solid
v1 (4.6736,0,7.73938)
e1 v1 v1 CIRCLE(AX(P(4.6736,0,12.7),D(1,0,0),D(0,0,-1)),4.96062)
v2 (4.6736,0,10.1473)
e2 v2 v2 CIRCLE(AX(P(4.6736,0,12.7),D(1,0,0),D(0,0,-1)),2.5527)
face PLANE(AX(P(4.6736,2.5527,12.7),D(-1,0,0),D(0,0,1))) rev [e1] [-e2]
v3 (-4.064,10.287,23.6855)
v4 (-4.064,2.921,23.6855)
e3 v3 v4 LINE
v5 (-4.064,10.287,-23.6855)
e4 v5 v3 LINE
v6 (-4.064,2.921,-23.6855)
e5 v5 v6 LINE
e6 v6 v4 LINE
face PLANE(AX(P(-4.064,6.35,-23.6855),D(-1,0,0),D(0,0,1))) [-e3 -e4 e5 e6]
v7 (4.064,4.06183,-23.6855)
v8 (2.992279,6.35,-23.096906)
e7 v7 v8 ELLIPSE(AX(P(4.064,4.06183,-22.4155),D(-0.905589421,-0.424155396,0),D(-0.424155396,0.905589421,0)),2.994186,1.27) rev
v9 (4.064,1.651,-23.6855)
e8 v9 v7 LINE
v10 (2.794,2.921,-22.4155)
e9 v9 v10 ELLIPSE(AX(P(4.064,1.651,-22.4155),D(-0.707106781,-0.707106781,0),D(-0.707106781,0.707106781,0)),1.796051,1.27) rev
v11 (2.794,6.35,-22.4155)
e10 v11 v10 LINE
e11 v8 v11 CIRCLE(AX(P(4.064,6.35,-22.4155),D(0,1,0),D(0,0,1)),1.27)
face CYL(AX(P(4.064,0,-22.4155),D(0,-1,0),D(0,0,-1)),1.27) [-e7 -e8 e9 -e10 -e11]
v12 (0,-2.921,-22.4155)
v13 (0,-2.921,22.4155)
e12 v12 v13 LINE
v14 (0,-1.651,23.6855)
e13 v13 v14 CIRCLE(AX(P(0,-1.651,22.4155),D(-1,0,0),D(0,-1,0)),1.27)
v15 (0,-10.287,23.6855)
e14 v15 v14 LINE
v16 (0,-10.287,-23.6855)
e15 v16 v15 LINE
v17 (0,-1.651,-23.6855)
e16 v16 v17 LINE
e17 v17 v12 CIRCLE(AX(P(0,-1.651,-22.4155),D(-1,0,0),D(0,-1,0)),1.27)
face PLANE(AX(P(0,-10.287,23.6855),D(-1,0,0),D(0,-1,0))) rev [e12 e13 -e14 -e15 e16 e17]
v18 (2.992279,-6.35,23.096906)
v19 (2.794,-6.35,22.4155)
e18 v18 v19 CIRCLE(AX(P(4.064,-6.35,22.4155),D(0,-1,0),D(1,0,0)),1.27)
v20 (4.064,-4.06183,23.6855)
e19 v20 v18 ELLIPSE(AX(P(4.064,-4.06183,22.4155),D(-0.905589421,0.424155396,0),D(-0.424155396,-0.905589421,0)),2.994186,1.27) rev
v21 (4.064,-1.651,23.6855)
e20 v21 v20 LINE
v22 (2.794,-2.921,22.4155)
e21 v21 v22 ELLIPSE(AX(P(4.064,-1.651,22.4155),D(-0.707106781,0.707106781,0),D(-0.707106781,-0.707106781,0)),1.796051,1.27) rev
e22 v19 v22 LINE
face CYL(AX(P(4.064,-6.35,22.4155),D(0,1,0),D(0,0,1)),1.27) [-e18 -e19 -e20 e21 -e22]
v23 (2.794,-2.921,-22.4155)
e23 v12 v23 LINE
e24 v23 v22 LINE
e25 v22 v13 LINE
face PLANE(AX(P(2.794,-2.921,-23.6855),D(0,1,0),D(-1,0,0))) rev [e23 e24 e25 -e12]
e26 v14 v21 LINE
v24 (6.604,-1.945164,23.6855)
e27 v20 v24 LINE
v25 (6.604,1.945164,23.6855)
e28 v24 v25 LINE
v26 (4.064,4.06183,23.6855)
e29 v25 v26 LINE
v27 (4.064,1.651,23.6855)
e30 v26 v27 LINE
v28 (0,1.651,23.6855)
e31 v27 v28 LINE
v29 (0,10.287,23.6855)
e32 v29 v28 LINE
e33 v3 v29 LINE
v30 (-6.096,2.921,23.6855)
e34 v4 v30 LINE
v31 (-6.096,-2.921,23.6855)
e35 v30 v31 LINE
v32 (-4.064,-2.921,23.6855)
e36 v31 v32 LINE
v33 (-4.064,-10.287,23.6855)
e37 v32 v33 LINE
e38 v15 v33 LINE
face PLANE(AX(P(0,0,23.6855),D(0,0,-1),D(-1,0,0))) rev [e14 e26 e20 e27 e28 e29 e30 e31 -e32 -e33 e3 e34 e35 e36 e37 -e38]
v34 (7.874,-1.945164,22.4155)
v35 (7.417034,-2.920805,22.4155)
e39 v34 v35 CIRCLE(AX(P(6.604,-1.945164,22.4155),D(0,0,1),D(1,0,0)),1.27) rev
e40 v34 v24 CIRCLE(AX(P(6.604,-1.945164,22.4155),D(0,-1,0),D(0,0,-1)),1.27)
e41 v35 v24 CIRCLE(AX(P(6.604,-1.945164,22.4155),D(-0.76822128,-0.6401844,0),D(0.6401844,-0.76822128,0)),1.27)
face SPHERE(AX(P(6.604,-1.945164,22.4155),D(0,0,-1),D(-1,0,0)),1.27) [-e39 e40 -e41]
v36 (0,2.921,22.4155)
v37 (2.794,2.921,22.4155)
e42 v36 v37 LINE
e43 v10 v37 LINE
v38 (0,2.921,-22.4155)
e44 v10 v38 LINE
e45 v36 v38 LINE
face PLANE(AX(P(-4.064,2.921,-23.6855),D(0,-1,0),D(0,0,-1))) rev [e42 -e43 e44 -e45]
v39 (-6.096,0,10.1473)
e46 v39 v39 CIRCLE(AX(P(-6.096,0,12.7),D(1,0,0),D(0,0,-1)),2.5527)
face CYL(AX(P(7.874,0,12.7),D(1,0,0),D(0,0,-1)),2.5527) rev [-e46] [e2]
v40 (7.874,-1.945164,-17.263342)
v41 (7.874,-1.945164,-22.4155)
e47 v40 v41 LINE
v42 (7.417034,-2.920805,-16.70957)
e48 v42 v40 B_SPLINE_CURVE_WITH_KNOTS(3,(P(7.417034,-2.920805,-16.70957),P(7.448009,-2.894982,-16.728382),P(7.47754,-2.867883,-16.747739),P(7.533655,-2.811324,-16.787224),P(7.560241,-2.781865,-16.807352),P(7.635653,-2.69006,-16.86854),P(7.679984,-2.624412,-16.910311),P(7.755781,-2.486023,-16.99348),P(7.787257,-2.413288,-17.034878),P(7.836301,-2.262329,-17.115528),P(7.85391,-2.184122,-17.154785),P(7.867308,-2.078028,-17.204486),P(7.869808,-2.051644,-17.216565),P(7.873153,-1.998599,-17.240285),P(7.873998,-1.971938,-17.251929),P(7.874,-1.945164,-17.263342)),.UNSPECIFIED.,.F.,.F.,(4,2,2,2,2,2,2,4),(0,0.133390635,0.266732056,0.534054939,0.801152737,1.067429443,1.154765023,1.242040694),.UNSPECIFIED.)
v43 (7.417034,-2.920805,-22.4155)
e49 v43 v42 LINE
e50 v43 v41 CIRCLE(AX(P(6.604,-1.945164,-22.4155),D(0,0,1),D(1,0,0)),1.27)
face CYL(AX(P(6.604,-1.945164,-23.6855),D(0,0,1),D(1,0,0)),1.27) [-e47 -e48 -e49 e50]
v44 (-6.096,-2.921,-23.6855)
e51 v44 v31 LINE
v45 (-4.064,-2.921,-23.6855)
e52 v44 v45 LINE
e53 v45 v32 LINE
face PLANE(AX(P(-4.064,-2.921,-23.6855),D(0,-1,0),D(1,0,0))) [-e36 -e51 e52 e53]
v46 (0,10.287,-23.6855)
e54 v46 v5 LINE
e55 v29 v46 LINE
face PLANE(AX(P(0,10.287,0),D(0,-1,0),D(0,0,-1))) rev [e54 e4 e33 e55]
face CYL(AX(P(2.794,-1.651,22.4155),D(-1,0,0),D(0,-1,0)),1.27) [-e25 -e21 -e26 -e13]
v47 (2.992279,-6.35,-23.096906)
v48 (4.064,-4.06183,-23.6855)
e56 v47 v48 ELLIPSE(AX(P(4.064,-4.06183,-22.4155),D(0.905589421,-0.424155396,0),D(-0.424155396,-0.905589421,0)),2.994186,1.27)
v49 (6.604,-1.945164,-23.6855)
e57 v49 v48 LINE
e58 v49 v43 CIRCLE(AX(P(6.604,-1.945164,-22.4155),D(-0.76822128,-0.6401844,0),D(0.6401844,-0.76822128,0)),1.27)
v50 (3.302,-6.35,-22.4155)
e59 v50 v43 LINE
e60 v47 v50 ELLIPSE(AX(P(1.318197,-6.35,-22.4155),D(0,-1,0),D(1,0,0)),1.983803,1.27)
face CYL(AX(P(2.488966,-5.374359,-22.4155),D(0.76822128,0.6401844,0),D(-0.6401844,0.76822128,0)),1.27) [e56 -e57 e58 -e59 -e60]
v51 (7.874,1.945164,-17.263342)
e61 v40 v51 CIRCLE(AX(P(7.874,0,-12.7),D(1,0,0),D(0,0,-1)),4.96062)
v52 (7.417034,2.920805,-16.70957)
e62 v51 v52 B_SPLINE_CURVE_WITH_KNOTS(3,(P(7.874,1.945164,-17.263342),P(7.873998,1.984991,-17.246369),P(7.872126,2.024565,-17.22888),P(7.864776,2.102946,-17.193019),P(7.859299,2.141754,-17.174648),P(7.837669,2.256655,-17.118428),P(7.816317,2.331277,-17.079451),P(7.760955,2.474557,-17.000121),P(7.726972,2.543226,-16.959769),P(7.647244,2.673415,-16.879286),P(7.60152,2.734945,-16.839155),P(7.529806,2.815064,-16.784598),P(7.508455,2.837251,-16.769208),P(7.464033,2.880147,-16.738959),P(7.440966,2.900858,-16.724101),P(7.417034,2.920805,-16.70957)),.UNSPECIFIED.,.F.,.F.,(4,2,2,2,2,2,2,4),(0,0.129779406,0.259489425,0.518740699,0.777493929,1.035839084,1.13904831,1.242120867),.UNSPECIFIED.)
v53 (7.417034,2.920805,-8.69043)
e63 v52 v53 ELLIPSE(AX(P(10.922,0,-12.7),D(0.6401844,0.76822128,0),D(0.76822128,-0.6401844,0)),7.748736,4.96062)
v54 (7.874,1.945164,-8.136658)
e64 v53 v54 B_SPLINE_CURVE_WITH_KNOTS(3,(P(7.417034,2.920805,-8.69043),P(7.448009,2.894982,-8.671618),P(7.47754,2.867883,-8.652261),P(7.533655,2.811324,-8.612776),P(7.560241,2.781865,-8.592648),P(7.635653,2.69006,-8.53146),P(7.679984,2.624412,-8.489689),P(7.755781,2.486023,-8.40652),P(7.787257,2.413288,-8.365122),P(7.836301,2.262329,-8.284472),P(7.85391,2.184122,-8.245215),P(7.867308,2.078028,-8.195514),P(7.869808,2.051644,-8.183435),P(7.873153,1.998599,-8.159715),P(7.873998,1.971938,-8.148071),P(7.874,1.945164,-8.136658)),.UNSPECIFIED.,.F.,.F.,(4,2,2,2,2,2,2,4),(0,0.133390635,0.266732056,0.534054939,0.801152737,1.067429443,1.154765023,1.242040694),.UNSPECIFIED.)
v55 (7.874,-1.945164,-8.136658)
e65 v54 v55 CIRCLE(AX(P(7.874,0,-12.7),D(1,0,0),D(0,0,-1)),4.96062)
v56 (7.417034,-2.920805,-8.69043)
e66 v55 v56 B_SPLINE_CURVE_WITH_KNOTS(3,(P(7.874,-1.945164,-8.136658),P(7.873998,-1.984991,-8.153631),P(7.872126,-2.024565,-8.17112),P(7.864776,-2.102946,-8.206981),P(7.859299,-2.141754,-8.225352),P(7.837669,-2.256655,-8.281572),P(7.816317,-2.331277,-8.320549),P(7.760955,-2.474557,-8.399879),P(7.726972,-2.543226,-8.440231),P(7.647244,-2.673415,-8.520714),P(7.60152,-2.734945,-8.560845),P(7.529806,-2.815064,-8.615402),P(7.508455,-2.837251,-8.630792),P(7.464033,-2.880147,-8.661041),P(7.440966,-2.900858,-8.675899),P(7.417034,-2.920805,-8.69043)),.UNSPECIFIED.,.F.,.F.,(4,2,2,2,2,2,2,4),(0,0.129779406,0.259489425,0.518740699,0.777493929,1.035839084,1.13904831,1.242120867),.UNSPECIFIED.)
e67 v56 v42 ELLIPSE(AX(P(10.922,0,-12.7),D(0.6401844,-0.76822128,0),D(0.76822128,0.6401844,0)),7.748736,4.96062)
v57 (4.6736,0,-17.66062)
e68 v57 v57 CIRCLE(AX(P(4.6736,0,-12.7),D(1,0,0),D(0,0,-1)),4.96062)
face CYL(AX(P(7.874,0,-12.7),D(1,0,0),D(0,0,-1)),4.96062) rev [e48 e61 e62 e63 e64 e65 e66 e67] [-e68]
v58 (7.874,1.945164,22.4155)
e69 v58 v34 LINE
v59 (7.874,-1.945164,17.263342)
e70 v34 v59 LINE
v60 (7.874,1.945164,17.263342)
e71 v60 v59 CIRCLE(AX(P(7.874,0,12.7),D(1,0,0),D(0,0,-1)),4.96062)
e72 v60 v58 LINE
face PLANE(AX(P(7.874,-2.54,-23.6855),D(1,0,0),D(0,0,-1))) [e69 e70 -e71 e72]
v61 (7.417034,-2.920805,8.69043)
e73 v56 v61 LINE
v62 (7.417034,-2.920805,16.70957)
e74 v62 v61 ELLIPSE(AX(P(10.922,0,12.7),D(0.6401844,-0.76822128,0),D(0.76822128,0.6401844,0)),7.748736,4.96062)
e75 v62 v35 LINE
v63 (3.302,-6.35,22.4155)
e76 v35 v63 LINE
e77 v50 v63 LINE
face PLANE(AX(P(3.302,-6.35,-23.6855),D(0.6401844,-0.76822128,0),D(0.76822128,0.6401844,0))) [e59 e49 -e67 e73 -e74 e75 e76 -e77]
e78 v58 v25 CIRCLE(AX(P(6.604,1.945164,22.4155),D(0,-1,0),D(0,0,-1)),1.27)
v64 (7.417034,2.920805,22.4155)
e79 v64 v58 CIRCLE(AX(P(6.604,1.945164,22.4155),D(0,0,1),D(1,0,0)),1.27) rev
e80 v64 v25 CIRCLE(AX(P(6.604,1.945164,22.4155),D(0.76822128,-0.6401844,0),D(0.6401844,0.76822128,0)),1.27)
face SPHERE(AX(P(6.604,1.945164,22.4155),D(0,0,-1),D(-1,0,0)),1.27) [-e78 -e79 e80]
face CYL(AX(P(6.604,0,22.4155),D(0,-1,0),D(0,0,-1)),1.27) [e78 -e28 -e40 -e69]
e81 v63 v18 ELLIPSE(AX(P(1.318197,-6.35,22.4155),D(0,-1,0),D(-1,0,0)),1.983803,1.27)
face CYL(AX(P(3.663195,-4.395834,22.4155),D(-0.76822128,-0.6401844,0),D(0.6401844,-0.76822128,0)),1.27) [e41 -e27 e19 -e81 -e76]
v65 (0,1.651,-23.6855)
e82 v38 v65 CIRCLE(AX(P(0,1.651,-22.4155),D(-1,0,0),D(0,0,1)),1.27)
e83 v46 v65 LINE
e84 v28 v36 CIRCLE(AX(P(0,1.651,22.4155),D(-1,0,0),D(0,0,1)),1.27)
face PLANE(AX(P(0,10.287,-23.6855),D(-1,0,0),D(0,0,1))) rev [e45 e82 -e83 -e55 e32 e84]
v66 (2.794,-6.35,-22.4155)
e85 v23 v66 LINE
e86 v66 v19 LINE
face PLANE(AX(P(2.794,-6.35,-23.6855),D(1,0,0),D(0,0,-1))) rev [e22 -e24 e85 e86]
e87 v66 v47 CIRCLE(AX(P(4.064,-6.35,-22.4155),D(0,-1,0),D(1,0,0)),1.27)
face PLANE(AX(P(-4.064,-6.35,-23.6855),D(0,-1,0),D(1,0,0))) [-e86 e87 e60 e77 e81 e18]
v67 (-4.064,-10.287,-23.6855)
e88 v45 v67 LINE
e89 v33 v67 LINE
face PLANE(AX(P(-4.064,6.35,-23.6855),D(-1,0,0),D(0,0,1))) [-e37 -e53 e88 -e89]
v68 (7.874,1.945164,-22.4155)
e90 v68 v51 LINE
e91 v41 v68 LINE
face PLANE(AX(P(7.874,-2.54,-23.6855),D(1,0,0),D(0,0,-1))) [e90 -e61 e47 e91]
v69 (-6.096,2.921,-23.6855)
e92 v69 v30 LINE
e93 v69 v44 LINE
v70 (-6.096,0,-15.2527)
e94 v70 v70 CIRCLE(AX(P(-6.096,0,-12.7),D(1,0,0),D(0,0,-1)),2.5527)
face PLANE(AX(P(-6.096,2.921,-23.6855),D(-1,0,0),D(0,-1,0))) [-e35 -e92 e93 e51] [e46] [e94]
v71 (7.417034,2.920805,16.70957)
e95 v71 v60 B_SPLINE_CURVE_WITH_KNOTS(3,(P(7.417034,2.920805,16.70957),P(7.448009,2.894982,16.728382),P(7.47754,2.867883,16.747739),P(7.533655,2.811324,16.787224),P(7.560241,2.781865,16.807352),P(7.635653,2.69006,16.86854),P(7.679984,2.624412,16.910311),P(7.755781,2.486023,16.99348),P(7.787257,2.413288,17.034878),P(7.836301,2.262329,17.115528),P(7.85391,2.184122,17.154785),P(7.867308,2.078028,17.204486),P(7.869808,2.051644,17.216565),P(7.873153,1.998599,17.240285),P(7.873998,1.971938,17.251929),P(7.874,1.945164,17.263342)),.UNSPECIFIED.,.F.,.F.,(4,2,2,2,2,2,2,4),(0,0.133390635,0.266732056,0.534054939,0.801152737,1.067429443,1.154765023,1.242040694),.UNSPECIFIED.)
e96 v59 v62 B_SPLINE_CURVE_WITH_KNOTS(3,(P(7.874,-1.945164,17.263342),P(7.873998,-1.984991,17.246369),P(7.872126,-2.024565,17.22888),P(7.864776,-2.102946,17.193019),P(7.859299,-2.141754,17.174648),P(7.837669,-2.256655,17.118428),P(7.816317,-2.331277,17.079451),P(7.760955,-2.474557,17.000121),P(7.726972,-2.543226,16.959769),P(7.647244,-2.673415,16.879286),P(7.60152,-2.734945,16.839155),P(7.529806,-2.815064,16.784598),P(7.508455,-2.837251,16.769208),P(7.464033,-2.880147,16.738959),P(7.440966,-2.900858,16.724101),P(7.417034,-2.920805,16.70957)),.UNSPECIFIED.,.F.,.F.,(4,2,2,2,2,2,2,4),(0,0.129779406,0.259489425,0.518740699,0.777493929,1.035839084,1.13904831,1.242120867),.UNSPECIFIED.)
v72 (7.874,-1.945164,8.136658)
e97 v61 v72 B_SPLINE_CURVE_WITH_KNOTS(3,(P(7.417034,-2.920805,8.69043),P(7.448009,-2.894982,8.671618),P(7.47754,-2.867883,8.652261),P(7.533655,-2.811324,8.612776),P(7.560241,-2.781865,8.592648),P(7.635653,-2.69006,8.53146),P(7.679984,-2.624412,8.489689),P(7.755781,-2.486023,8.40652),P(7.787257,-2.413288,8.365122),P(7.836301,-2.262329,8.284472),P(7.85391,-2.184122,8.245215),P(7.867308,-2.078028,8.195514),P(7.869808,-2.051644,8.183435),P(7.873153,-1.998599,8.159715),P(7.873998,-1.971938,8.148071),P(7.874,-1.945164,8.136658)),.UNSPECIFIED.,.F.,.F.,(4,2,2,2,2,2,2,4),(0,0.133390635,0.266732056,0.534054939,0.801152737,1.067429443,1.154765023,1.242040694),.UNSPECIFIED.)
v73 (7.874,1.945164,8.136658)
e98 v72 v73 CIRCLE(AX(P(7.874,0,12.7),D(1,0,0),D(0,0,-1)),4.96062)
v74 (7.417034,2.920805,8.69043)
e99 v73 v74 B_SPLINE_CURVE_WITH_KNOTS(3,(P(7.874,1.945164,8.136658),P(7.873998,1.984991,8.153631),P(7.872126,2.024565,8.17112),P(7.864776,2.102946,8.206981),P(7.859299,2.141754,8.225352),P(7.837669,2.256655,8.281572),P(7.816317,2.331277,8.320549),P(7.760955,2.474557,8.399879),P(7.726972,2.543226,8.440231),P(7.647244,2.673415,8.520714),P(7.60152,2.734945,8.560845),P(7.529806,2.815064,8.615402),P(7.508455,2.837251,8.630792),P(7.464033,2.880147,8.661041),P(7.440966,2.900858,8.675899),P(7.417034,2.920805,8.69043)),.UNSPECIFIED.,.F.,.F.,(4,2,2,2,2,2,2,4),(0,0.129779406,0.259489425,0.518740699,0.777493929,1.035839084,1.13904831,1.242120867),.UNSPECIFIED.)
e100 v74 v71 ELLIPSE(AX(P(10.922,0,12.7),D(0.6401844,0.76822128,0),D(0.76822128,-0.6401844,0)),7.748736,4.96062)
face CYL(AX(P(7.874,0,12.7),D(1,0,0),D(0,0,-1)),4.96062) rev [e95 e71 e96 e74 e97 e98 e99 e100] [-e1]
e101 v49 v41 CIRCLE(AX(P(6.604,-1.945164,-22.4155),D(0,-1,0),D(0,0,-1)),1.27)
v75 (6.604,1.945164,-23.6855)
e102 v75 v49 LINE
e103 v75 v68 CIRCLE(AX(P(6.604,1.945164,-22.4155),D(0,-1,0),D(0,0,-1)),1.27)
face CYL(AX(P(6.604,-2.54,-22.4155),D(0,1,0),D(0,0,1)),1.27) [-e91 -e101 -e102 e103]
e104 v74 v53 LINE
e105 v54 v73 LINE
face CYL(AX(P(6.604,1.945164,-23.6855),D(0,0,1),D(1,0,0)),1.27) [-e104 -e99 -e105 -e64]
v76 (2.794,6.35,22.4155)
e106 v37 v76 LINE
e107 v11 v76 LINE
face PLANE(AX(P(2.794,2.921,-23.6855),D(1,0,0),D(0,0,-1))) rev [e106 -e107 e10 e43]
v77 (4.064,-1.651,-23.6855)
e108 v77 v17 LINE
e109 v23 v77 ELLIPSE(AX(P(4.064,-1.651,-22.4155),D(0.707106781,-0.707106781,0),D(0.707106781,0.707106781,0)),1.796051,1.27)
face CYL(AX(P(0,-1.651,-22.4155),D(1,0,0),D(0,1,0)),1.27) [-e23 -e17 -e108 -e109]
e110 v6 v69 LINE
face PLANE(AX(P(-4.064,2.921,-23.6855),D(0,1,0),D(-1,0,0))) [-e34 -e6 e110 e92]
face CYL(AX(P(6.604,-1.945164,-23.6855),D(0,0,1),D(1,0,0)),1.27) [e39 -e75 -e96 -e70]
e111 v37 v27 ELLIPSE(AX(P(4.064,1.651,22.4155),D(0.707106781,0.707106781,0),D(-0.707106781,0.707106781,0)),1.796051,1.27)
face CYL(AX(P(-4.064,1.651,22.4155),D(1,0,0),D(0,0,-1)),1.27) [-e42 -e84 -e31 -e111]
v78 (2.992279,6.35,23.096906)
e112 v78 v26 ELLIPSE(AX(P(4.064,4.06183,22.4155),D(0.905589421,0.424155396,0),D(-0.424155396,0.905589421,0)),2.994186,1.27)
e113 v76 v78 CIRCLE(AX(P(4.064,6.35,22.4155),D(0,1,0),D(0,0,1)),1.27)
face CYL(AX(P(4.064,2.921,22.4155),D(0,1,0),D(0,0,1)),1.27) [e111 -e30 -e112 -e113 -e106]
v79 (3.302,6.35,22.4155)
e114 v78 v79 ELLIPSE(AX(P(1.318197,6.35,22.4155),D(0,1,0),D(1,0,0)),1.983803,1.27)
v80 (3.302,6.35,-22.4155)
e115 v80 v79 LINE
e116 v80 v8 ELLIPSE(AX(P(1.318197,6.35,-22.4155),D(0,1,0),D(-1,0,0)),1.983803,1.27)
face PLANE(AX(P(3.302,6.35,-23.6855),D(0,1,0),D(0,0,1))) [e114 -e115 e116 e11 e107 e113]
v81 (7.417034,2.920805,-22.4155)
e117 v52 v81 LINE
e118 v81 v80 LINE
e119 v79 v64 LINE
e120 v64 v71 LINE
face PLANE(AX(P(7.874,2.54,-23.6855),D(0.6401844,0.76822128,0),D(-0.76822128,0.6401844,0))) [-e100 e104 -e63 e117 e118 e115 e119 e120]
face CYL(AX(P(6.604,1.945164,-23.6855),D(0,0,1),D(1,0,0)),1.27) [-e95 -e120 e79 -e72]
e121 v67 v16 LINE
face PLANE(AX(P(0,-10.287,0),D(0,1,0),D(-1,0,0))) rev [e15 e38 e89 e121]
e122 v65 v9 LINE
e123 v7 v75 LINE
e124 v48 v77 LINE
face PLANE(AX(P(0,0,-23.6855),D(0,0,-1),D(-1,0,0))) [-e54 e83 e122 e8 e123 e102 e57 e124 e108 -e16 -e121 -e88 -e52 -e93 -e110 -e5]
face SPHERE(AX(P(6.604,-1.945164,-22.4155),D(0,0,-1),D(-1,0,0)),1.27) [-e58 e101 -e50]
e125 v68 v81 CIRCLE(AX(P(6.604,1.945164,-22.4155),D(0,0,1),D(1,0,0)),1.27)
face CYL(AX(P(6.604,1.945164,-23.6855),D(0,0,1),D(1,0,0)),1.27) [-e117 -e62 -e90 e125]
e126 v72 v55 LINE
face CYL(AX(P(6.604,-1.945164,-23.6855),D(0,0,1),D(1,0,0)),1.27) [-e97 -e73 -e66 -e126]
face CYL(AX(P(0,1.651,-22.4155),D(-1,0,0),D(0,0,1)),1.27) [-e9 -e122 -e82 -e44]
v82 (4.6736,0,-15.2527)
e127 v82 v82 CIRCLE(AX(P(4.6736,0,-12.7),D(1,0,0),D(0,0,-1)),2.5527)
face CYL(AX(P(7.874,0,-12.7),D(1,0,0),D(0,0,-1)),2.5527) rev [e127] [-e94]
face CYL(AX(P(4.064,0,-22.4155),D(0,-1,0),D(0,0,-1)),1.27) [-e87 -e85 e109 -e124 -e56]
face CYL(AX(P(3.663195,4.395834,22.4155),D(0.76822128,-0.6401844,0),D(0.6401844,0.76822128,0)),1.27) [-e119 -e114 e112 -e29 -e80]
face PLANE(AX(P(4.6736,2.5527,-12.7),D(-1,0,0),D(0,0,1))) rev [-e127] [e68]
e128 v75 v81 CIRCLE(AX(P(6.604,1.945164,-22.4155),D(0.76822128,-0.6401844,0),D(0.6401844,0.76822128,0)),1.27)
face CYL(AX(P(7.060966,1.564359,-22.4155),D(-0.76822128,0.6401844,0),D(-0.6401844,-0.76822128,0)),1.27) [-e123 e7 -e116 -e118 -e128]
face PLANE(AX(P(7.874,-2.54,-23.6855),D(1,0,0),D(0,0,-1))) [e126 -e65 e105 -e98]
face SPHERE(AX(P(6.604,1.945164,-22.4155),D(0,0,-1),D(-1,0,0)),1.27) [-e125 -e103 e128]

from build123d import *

# Parameters (mm, degrees)
BOSS_EXTRUDE1_DEPTH                             = 47.371
SKETCH2_W                                       = 6.858
SKETCH2_H                                       = 3.429
CUT_EXTRUDE1_DEPTH                              = 49.438972089
SKETCH3_W                                       = 4.064
SKETCH3_H                                       = 47.371
BOSS_EXTRUDE2_DEPTH                             = 7.366
SKETCH4_W                                       = 6.858
SKETCH4_H                                       = 3.429
CUT_EXTRUDE2_DEPTH                              = 50.110425431
SKETCH5_W                                       = 4.064
SKETCH5_H                                       = 47.371
BOSS_EXTRUDE3_DEPTH                             = 7.366
F_3_CLEARANCE_HOLE1_D                           = 2.7686
SKETCH9_W                                       = 2.032
SKETCH9_H                                       = 5.842
BOSS_EXTRUDE4_DEPTH                             = 47.371
SKETCH10_R                                      = 1.3843
CUT_EXTRUDE3_DEPTH                              = 2.54
CBORE_FOR_10_BUTTON_HEAD_CAP_SCREW1_D           = 5.1054
CBORE_FOR_10_BUTTON_HEAD_CAP_SCREW1_CBORE_D     = 9.92124
CBORE_FOR_10_BUTTON_HEAD_CAP_SCREW1_CBORE_DEPTH = 3.2004
FILLET1_R                                       = 1.27
FILLET3_R                                       = 1.27
FILLET5_R                                       = 1.27


with BuildPart() as part:
    # Sketch1 → Boss-Extrude1 (new body)
    with BuildSketch(Plane.XY.offset(23.6855)):
        Polygon((3.302, 6.35), (-4.064, 6.35), (-4.064, -6.35), (3.302, -6.35), (7.874, -2.54), (7.874, 2.54), align=None)
    extrude(amount=-BOSS_EXTRUDE1_DEPTH)

    # Sketch2 → Cut-Extrude1 (cut, through all)
    with BuildSketch(Plane.XY.offset(23.6855)):
        with Locations((-0.635, 4.6355)):
            Rectangle(SKETCH2_W, SKETCH2_H)
    extrude(amount=-CUT_EXTRUDE1_DEPTH, mode=Mode.SUBTRACT)

    # Sketch3 → Boss-Extrude2 (add)
    with BuildSketch(Plane(origin=(0, 2.921, 0), x_dir=(-1, 0, 0), z_dir=(0, 1, 0))):
        with Locations((2.032, 0)):
            Rectangle(SKETCH3_W, SKETCH3_H)
    extrude(amount=BOSS_EXTRUDE2_DEPTH)

    # Sketch4 → Cut-Extrude2 (cut, through all)
    with BuildSketch(Plane.XY.offset(23.6855)):
        with Locations((-0.635, -4.6355)):
            Rectangle(SKETCH4_W, SKETCH4_H)
    extrude(amount=-CUT_EXTRUDE2_DEPTH, mode=Mode.SUBTRACT)

    # Sketch5 → Boss-Extrude3 (add)
    with BuildSketch(Plane.XZ.offset(2.921)):
        with Locations((-2.032, 0)):
            Rectangle(SKETCH5_W, SKETCH5_H)
    extrude(amount=BOSS_EXTRUDE3_DEPTH)

    # #3 Clearance Hole1 (through all)
    with Locations(Plane.ZY.offset(4.064)):
        with Locations((12.7, 0), (-12.7, 0)):
            Hole(F_3_CLEARANCE_HOLE1_D / 2)

    # Sketch9 → Boss-Extrude4 (add, through all)
    with BuildSketch(Plane.XY.offset(23.6855)):
        with Locations((-5.08, 0)):
            Rectangle(SKETCH9_W, SKETCH9_H)
    extrude(amount=-BOSS_EXTRUDE4_DEPTH)

    # Sketch10 → Cut-Extrude3 (cut)
    with BuildSketch(Plane(origin=(-4.064, 0, 0), x_dir=(0, 0, -1), z_dir=(1, 0, 0))):
        with Locations(Location((-12.7, 0, 0), (0, 0, 180))):
            Circle(SKETCH10_R)
    extrude(amount=-CUT_EXTRUDE3_DEPTH, mode=Mode.SUBTRACT)

    # CBORE for #10 Button Head Cap Screw1 (through all)
    with Locations(Plane(origin=(7.874, 0, 0), x_dir=(0, 0, -1), z_dir=(1, 0, 0))):
        with Locations((-12.7, 0), (12.7, 0)):
            CounterBoreHole(CBORE_FOR_10_BUTTON_HEAD_CAP_SCREW1_D / 2, CBORE_FOR_10_BUTTON_HEAD_CAP_SCREW1_CBORE_D / 2, CBORE_FOR_10_BUTTON_HEAD_CAP_SCREW1_CBORE_DEPTH)

    # Fillet1
    fillet1_edges = [part.edges().sort_by_distance(p)[0] for p in [
        (7.874, -2.54, 20.323251747),
        (7.874, -2.54, -20.323251747),
        (7.874, -2.54, 0),
        (7.874, 2.54, 20.323251747),
        (7.874, 2.54, 0),
        (7.874, 2.54, -20.323251747),
    ]]
    fillet(fillet1_edges, radius=FILLET1_R)

    # Fillet3
    # the kernel refuses this fillet: 1.27 mm, written as the material it takes off along each edge
    with BuildSketch(Plane(origin=(0.862897437, -8.382585469, -23.6855), x_dir=(0, 0, 1), z_dir=(0.7682212795973759, 0.6401843996644799, 0)), Plane(origin=(7.417034188, 2.920804844, -23.6855), x_dir=(0, 0, 1), z_dir=(-0.7682212795973759, 0.6401843996644799, 0))) as fillet3_piece_1:
        with BuildLine():
            CenterArc((FILLET3_R, -FILLET3_R), FILLET3_R, 90, 90)
            Line((0, -FILLET3_R), (0, 0))
            Line((0, 0), (FILLET3_R, 0))
        make_face()
    extrude(amount=8.531574072, mode=Mode.SUBTRACT)
    with BuildSketch(Plane(origin=(6.604, -1.945163819, -23.6855), x_dir=(0.6401843996644796, -0.7682212795973762, 0), z_dir=(-0.7682212795973762, -0.6401843996644796, 0))) as fillet3_piece_2:
        with BuildLine():
            CenterArc((1.27 - FILLET3_R, FILLET3_R), FILLET3_R, 270, 90)
            Line((1.27, FILLET3_R), (1.27, 0))
            Line((1.27, 0), (1.27 - FILLET3_R, 0))
        make_face()
    revolve(axis=Axis((6.604, -1.945163819, -23.6855), (0, 0, 1)), revolution_arc=50.194428908, mode=Mode.SUBTRACT)
    with BuildSketch(Plane(origin=(6.604, 1.945163819, -23.6855), x_dir=(0.6401843996644799, 0.7682212795973757, 0), z_dir=(-0.7682212795973757, 0.6401843996644799, 0))) as fillet3_piece_3:
        with BuildLine():
            CenterArc((1.27 - FILLET3_R, -FILLET3_R), FILLET3_R, 0, 90)
            Line((1.27, -FILLET3_R), (1.27, 0))
            Line((1.27, 0), (1.27 - FILLET3_R, 0))
        make_face()
    revolve(axis=Axis((6.604, 1.945163819, -23.6855), (0, 0, -1)), revolution_arc=50.194428908, mode=Mode.SUBTRACT)
    with BuildSketch(Plane(origin=(2.794, -2.921, -23.6855), x_dir=(0, 0, 1), z_dir=(-1, 0, 0)), Plane(origin=(0, 2.921, -23.6855), x_dir=(0, 0, 1), z_dir=(1, 0, 0))) as fillet3_piece_4:
        with BuildLine():
            CenterArc((FILLET3_R, FILLET3_R), FILLET3_R, 180, 90)
            Line((0, FILLET3_R), (0, 0))
            Line((0, 0), (FILLET3_R, 0))
        make_face()
    extrude(amount=2.794, mode=Mode.SUBTRACT)
    with BuildSketch(Plane(origin=(2.794, 2.921, -23.6855), x_dir=(0, 0, 1), z_dir=(0, 1, 0)), Plane(origin=(2.794, -9.525, -23.6855), x_dir=(0, 0, 1), z_dir=(0, 1, 0))) as fillet3_piece_5:
        with BuildLine():
            CenterArc((FILLET3_R, FILLET3_R), FILLET3_R, 180, 90)
            Line((0, FILLET3_R), (0, 0))
            Line((0, 0), (FILLET3_R, 0))
        make_face()
    extrude(amount=6.604, mode=Mode.SUBTRACT)
    with BuildSketch(Plane(origin=(7.874, -1.945163819, -23.6855), x_dir=(-1, 0, 0), z_dir=(0, 1, 0))) as fillet3_piece_6:
        with BuildLine():
            CenterArc((FILLET3_R, FILLET3_R), FILLET3_R, 180, 90)
            Line((0, FILLET3_R), (0, 0))
            Line((0, 0), (FILLET3_R, 0))
        make_face()
    extrude(amount=3.890327637, mode=Mode.SUBTRACT)
    with BuildSketch(Plane(origin=(2.794, -9.525, -23.6855), x_dir=(0, 0, 1), z_dir=(0, 1, 0))) as fillet3_piece_7a_section:
        with BuildLine():
            CenterArc((FILLET3_R, FILLET3_R), FILLET3_R, 180, 90)
            Line((0, FILLET3_R), (0, 0))
            Line((0, 0), (FILLET3_R, 0))
        make_face()
    fillet3_piece_7a = extrude(amount=9.779, mode=Mode.PRIVATE)
    fillet3_piece_7a = split(fillet3_piece_7a, bisect_by=Plane(origin=(3.081521795, -2.921, -23.397978205), z_dir=(0, 1, 0)), keep=Keep.TOP, mode=Mode.PRIVATE)
    with BuildSketch(Plane(origin=(5.969, -2.921, -23.6855), x_dir=(0, 0, 1), z_dir=(-1, 0, 0))) as fillet3_piece_7b_section:
        with BuildLine():
            CenterArc((FILLET3_R, FILLET3_R), FILLET3_R, 180, 90)
            Line((0, FILLET3_R), (0, 0))
            Line((0, 0), (FILLET3_R, 0))
        make_face()
    fillet3_piece_7b = extrude(amount=5.969, mode=Mode.PRIVATE)
    fillet3_piece_7b = split(fillet3_piece_7b, bisect_by=Plane(origin=(2.794, -2.633478205, -23.397978205), z_dir=(1, 0, 0)), keep=Keep.TOP, mode=Mode.PRIVATE)
    fillet3_piece_7 = fillet3_piece_7a & fillet3_piece_7b
    add(fillet3_piece_7, mode=Mode.SUBTRACT)
    with BuildSketch(Plane(origin=(2.794, -0.254, -23.6855), x_dir=(0, 0, 1), z_dir=(0, 1, 0))) as fillet3_piece_8a_section:
        with BuildLine():
            CenterArc((FILLET3_R, FILLET3_R), FILLET3_R, 180, 90)
            Line((0, FILLET3_R), (0, 0))
            Line((0, 0), (FILLET3_R, 0))
        make_face()
    fillet3_piece_8a = extrude(amount=9.779, mode=Mode.PRIVATE)
    fillet3_piece_8a = split(fillet3_piece_8a, bisect_by=Plane(origin=(3.081521795, 2.921, -23.397978205), z_dir=(0, -1, 0)), keep=Keep.TOP, mode=Mode.PRIVATE)
    with BuildSketch(Plane(origin=(0, 2.921, -23.6855), x_dir=(0, 0, 1), z_dir=(1, 0, 0))) as fillet3_piece_8b_section:
        with BuildLine():
            CenterArc((FILLET3_R, FILLET3_R), FILLET3_R, 180, 90)
            Line((0, FILLET3_R), (0, 0))
            Line((0, 0), (FILLET3_R, 0))
        make_face()
    fillet3_piece_8b = extrude(amount=5.969, mode=Mode.PRIVATE)
    fillet3_piece_8b = split(fillet3_piece_8b, bisect_by=Plane(origin=(2.794, 2.633478205, -23.397978205), z_dir=(1, 0, 0)), keep=Keep.TOP, mode=Mode.PRIVATE)
    fillet3_piece_8 = fillet3_piece_8a & fillet3_piece_8b
    add(fillet3_piece_8, mode=Mode.SUBTRACT)

    # Fillet5
    # the kernel refuses this fillet: 1.27 mm, written as the material it takes off along each edge
    with BuildSketch(Plane(origin=(0.862897437, -8.382585469, 23.6855), x_dir=(-0.6401843996644799, 0.7682212795973759, 0), z_dir=(0.7682212795973759, 0.6401843996644799, 0)), Plane(origin=(7.417034188, 2.920804844, 23.6855), x_dir=(-0.6401843996644799, -0.7682212795973759, 0), z_dir=(-0.7682212795973759, 0.6401843996644799, 0))) as fillet5_piece_1:
        with BuildLine():
            CenterArc((FILLET5_R, -FILLET5_R), FILLET5_R, 90, 90)
            Line((0, -FILLET5_R), (0, 0))
            Line((0, 0), (FILLET5_R, 0))
        make_face()
    extrude(amount=8.531574072, mode=Mode.SUBTRACT)
    with BuildSketch(Plane(origin=(6.604, -1.945163819, 23.6855), x_dir=(1, 0, 0), z_dir=(0, 1, 0))) as fillet5_piece_2:
        with BuildLine():
            CenterArc((1.27 - FILLET5_R, FILLET5_R), FILLET5_R, 270, 90)
            Line((1.27, FILLET5_R), (1.27, 0))
            Line((1.27, 0), (1.27 - FILLET5_R, 0))
        make_face()
    revolve(axis=Axis((6.604, -1.945163819, 23.6855), (0, 0, -1)), revolution_arc=50.194428908, mode=Mode.SUBTRACT)
    with BuildSketch(Plane(origin=(6.604, 1.945163819, 23.6855), x_dir=(0.6401843996644799, 0.7682212795973757, 0), z_dir=(-0.7682212795973757, 0.6401843996644799, 0))) as fillet5_piece_3:
        with BuildLine():
            CenterArc((1.27 - FILLET5_R, FILLET5_R), FILLET5_R, 270, 90)
            Line((1.27, FILLET5_R), (1.27, 0))
            Line((1.27, 0), (1.27 - FILLET5_R, 0))
        make_face()
    revolve(axis=Axis((6.604, 1.945163819, 23.6855), (0, 0, -1)), revolution_arc=50.194428908, mode=Mode.SUBTRACT)
    with BuildSketch(Plane(origin=(2.794, 2.921, 23.6855), x_dir=(1, 0, 0), z_dir=(0, 1, 0)), Plane(origin=(2.794, -9.525, 23.6855), x_dir=(1, 0, 0), z_dir=(0, 1, 0))) as fillet5_piece_4:
        with BuildLine():
            CenterArc((FILLET5_R, FILLET5_R), FILLET5_R, 180, 90)
            Line((0, FILLET5_R), (0, 0))
            Line((0, 0), (FILLET5_R, 0))
        make_face()
    extrude(amount=6.604, mode=Mode.SUBTRACT)
    with BuildSketch(Plane(origin=(0, 2.921, 23.6855), x_dir=(0, -1, 0), z_dir=(1, 0, 0)), Plane(origin=(2.794, -2.921, 23.6855), x_dir=(0, 1, 0), z_dir=(-1, 0, 0))) as fillet5_piece_5:
        with BuildLine():
            CenterArc((FILLET5_R, FILLET5_R), FILLET5_R, 180, 90)
            Line((0, FILLET5_R), (0, 0))
            Line((0, 0), (FILLET5_R, 0))
        make_face()
    extrude(amount=2.794, mode=Mode.SUBTRACT)
    with BuildSketch(Plane(origin=(7.874, -1.945163819, 23.6855), x_dir=(-1, 0, 0), z_dir=(0, 1, 0))) as fillet5_piece_6:
        with BuildLine():
            CenterArc((FILLET5_R, -FILLET5_R), FILLET5_R, 90, 90)
            Line((0, -FILLET5_R), (0, 0))
            Line((0, 0), (FILLET5_R, 0))
        make_face()
    extrude(amount=3.890327637, mode=Mode.SUBTRACT)
    with BuildSketch(Plane(origin=(2.794, -0.254, 23.6855), x_dir=(1, 0, 0), z_dir=(0, 1, 0))) as fillet5_piece_7a_section:
        with BuildLine():
            CenterArc((FILLET5_R, FILLET5_R), FILLET5_R, 180, 90)
            Line((0, FILLET5_R), (0, 0))
            Line((0, 0), (FILLET5_R, 0))
        make_face()
    fillet5_piece_7a = extrude(amount=9.779, mode=Mode.PRIVATE)
    fillet5_piece_7a = split(fillet5_piece_7a, bisect_by=Plane(origin=(3.081521795, 2.921, 23.397978205), z_dir=(0, -1, 0)), keep=Keep.TOP, mode=Mode.PRIVATE)
    with BuildSketch(Plane(origin=(0, 2.921, 23.6855), x_dir=(0, -1, 0), z_dir=(1, 0, 0))) as fillet5_piece_7b_section:
        with BuildLine():
            CenterArc((FILLET5_R, FILLET5_R), FILLET5_R, 180, 90)
            Line((0, FILLET5_R), (0, 0))
            Line((0, 0), (FILLET5_R, 0))
        make_face()
    fillet5_piece_7b = extrude(amount=5.969, mode=Mode.PRIVATE)
    fillet5_piece_7b = split(fillet5_piece_7b, bisect_by=Plane(origin=(2.794, 2.633478205, 23.397978205), z_dir=(1, 0, 0)), keep=Keep.TOP, mode=Mode.PRIVATE)
    fillet5_piece_7 = fillet5_piece_7a & fillet5_piece_7b
    add(fillet5_piece_7, mode=Mode.SUBTRACT)
    with BuildSketch(Plane(origin=(2.794, -9.525, 23.6855), x_dir=(1, 0, 0), z_dir=(0, 1, 0))) as fillet5_piece_8a_section:
        with BuildLine():
            CenterArc((FILLET5_R, FILLET5_R), FILLET5_R, 180, 90)
            Line((0, FILLET5_R), (0, 0))
            Line((0, 0), (FILLET5_R, 0))
        make_face()
    fillet5_piece_8a = extrude(amount=9.779, mode=Mode.PRIVATE)
    fillet5_piece_8a = split(fillet5_piece_8a, bisect_by=Plane(origin=(3.081521795, -2.921, 23.397978205), z_dir=(0, 1, 0)), keep=Keep.TOP, mode=Mode.PRIVATE)
    with BuildSketch(Plane(origin=(5.969, -2.921, 23.6855), x_dir=(0, 1, 0), z_dir=(-1, 0, 0))) as fillet5_piece_8b_section:
        with BuildLine():
            CenterArc((FILLET5_R, FILLET5_R), FILLET5_R, 180, 90)
            Line((0, FILLET5_R), (0, 0))
            Line((0, 0), (FILLET5_R, 0))
        make_face()
    fillet5_piece_8b = extrude(amount=5.969, mode=Mode.PRIVATE)
    fillet5_piece_8b = split(fillet5_piece_8b, bisect_by=Plane(origin=(2.794, -2.633478205, 23.397978205), z_dir=(1, 0, 0)), keep=Keep.TOP, mode=Mode.PRIVATE)
    fillet5_piece_8 = fillet5_piece_8a & fillet5_piece_8b
    add(fillet5_piece_8, mode=Mode.SUBTRACT)


solid = part.part
